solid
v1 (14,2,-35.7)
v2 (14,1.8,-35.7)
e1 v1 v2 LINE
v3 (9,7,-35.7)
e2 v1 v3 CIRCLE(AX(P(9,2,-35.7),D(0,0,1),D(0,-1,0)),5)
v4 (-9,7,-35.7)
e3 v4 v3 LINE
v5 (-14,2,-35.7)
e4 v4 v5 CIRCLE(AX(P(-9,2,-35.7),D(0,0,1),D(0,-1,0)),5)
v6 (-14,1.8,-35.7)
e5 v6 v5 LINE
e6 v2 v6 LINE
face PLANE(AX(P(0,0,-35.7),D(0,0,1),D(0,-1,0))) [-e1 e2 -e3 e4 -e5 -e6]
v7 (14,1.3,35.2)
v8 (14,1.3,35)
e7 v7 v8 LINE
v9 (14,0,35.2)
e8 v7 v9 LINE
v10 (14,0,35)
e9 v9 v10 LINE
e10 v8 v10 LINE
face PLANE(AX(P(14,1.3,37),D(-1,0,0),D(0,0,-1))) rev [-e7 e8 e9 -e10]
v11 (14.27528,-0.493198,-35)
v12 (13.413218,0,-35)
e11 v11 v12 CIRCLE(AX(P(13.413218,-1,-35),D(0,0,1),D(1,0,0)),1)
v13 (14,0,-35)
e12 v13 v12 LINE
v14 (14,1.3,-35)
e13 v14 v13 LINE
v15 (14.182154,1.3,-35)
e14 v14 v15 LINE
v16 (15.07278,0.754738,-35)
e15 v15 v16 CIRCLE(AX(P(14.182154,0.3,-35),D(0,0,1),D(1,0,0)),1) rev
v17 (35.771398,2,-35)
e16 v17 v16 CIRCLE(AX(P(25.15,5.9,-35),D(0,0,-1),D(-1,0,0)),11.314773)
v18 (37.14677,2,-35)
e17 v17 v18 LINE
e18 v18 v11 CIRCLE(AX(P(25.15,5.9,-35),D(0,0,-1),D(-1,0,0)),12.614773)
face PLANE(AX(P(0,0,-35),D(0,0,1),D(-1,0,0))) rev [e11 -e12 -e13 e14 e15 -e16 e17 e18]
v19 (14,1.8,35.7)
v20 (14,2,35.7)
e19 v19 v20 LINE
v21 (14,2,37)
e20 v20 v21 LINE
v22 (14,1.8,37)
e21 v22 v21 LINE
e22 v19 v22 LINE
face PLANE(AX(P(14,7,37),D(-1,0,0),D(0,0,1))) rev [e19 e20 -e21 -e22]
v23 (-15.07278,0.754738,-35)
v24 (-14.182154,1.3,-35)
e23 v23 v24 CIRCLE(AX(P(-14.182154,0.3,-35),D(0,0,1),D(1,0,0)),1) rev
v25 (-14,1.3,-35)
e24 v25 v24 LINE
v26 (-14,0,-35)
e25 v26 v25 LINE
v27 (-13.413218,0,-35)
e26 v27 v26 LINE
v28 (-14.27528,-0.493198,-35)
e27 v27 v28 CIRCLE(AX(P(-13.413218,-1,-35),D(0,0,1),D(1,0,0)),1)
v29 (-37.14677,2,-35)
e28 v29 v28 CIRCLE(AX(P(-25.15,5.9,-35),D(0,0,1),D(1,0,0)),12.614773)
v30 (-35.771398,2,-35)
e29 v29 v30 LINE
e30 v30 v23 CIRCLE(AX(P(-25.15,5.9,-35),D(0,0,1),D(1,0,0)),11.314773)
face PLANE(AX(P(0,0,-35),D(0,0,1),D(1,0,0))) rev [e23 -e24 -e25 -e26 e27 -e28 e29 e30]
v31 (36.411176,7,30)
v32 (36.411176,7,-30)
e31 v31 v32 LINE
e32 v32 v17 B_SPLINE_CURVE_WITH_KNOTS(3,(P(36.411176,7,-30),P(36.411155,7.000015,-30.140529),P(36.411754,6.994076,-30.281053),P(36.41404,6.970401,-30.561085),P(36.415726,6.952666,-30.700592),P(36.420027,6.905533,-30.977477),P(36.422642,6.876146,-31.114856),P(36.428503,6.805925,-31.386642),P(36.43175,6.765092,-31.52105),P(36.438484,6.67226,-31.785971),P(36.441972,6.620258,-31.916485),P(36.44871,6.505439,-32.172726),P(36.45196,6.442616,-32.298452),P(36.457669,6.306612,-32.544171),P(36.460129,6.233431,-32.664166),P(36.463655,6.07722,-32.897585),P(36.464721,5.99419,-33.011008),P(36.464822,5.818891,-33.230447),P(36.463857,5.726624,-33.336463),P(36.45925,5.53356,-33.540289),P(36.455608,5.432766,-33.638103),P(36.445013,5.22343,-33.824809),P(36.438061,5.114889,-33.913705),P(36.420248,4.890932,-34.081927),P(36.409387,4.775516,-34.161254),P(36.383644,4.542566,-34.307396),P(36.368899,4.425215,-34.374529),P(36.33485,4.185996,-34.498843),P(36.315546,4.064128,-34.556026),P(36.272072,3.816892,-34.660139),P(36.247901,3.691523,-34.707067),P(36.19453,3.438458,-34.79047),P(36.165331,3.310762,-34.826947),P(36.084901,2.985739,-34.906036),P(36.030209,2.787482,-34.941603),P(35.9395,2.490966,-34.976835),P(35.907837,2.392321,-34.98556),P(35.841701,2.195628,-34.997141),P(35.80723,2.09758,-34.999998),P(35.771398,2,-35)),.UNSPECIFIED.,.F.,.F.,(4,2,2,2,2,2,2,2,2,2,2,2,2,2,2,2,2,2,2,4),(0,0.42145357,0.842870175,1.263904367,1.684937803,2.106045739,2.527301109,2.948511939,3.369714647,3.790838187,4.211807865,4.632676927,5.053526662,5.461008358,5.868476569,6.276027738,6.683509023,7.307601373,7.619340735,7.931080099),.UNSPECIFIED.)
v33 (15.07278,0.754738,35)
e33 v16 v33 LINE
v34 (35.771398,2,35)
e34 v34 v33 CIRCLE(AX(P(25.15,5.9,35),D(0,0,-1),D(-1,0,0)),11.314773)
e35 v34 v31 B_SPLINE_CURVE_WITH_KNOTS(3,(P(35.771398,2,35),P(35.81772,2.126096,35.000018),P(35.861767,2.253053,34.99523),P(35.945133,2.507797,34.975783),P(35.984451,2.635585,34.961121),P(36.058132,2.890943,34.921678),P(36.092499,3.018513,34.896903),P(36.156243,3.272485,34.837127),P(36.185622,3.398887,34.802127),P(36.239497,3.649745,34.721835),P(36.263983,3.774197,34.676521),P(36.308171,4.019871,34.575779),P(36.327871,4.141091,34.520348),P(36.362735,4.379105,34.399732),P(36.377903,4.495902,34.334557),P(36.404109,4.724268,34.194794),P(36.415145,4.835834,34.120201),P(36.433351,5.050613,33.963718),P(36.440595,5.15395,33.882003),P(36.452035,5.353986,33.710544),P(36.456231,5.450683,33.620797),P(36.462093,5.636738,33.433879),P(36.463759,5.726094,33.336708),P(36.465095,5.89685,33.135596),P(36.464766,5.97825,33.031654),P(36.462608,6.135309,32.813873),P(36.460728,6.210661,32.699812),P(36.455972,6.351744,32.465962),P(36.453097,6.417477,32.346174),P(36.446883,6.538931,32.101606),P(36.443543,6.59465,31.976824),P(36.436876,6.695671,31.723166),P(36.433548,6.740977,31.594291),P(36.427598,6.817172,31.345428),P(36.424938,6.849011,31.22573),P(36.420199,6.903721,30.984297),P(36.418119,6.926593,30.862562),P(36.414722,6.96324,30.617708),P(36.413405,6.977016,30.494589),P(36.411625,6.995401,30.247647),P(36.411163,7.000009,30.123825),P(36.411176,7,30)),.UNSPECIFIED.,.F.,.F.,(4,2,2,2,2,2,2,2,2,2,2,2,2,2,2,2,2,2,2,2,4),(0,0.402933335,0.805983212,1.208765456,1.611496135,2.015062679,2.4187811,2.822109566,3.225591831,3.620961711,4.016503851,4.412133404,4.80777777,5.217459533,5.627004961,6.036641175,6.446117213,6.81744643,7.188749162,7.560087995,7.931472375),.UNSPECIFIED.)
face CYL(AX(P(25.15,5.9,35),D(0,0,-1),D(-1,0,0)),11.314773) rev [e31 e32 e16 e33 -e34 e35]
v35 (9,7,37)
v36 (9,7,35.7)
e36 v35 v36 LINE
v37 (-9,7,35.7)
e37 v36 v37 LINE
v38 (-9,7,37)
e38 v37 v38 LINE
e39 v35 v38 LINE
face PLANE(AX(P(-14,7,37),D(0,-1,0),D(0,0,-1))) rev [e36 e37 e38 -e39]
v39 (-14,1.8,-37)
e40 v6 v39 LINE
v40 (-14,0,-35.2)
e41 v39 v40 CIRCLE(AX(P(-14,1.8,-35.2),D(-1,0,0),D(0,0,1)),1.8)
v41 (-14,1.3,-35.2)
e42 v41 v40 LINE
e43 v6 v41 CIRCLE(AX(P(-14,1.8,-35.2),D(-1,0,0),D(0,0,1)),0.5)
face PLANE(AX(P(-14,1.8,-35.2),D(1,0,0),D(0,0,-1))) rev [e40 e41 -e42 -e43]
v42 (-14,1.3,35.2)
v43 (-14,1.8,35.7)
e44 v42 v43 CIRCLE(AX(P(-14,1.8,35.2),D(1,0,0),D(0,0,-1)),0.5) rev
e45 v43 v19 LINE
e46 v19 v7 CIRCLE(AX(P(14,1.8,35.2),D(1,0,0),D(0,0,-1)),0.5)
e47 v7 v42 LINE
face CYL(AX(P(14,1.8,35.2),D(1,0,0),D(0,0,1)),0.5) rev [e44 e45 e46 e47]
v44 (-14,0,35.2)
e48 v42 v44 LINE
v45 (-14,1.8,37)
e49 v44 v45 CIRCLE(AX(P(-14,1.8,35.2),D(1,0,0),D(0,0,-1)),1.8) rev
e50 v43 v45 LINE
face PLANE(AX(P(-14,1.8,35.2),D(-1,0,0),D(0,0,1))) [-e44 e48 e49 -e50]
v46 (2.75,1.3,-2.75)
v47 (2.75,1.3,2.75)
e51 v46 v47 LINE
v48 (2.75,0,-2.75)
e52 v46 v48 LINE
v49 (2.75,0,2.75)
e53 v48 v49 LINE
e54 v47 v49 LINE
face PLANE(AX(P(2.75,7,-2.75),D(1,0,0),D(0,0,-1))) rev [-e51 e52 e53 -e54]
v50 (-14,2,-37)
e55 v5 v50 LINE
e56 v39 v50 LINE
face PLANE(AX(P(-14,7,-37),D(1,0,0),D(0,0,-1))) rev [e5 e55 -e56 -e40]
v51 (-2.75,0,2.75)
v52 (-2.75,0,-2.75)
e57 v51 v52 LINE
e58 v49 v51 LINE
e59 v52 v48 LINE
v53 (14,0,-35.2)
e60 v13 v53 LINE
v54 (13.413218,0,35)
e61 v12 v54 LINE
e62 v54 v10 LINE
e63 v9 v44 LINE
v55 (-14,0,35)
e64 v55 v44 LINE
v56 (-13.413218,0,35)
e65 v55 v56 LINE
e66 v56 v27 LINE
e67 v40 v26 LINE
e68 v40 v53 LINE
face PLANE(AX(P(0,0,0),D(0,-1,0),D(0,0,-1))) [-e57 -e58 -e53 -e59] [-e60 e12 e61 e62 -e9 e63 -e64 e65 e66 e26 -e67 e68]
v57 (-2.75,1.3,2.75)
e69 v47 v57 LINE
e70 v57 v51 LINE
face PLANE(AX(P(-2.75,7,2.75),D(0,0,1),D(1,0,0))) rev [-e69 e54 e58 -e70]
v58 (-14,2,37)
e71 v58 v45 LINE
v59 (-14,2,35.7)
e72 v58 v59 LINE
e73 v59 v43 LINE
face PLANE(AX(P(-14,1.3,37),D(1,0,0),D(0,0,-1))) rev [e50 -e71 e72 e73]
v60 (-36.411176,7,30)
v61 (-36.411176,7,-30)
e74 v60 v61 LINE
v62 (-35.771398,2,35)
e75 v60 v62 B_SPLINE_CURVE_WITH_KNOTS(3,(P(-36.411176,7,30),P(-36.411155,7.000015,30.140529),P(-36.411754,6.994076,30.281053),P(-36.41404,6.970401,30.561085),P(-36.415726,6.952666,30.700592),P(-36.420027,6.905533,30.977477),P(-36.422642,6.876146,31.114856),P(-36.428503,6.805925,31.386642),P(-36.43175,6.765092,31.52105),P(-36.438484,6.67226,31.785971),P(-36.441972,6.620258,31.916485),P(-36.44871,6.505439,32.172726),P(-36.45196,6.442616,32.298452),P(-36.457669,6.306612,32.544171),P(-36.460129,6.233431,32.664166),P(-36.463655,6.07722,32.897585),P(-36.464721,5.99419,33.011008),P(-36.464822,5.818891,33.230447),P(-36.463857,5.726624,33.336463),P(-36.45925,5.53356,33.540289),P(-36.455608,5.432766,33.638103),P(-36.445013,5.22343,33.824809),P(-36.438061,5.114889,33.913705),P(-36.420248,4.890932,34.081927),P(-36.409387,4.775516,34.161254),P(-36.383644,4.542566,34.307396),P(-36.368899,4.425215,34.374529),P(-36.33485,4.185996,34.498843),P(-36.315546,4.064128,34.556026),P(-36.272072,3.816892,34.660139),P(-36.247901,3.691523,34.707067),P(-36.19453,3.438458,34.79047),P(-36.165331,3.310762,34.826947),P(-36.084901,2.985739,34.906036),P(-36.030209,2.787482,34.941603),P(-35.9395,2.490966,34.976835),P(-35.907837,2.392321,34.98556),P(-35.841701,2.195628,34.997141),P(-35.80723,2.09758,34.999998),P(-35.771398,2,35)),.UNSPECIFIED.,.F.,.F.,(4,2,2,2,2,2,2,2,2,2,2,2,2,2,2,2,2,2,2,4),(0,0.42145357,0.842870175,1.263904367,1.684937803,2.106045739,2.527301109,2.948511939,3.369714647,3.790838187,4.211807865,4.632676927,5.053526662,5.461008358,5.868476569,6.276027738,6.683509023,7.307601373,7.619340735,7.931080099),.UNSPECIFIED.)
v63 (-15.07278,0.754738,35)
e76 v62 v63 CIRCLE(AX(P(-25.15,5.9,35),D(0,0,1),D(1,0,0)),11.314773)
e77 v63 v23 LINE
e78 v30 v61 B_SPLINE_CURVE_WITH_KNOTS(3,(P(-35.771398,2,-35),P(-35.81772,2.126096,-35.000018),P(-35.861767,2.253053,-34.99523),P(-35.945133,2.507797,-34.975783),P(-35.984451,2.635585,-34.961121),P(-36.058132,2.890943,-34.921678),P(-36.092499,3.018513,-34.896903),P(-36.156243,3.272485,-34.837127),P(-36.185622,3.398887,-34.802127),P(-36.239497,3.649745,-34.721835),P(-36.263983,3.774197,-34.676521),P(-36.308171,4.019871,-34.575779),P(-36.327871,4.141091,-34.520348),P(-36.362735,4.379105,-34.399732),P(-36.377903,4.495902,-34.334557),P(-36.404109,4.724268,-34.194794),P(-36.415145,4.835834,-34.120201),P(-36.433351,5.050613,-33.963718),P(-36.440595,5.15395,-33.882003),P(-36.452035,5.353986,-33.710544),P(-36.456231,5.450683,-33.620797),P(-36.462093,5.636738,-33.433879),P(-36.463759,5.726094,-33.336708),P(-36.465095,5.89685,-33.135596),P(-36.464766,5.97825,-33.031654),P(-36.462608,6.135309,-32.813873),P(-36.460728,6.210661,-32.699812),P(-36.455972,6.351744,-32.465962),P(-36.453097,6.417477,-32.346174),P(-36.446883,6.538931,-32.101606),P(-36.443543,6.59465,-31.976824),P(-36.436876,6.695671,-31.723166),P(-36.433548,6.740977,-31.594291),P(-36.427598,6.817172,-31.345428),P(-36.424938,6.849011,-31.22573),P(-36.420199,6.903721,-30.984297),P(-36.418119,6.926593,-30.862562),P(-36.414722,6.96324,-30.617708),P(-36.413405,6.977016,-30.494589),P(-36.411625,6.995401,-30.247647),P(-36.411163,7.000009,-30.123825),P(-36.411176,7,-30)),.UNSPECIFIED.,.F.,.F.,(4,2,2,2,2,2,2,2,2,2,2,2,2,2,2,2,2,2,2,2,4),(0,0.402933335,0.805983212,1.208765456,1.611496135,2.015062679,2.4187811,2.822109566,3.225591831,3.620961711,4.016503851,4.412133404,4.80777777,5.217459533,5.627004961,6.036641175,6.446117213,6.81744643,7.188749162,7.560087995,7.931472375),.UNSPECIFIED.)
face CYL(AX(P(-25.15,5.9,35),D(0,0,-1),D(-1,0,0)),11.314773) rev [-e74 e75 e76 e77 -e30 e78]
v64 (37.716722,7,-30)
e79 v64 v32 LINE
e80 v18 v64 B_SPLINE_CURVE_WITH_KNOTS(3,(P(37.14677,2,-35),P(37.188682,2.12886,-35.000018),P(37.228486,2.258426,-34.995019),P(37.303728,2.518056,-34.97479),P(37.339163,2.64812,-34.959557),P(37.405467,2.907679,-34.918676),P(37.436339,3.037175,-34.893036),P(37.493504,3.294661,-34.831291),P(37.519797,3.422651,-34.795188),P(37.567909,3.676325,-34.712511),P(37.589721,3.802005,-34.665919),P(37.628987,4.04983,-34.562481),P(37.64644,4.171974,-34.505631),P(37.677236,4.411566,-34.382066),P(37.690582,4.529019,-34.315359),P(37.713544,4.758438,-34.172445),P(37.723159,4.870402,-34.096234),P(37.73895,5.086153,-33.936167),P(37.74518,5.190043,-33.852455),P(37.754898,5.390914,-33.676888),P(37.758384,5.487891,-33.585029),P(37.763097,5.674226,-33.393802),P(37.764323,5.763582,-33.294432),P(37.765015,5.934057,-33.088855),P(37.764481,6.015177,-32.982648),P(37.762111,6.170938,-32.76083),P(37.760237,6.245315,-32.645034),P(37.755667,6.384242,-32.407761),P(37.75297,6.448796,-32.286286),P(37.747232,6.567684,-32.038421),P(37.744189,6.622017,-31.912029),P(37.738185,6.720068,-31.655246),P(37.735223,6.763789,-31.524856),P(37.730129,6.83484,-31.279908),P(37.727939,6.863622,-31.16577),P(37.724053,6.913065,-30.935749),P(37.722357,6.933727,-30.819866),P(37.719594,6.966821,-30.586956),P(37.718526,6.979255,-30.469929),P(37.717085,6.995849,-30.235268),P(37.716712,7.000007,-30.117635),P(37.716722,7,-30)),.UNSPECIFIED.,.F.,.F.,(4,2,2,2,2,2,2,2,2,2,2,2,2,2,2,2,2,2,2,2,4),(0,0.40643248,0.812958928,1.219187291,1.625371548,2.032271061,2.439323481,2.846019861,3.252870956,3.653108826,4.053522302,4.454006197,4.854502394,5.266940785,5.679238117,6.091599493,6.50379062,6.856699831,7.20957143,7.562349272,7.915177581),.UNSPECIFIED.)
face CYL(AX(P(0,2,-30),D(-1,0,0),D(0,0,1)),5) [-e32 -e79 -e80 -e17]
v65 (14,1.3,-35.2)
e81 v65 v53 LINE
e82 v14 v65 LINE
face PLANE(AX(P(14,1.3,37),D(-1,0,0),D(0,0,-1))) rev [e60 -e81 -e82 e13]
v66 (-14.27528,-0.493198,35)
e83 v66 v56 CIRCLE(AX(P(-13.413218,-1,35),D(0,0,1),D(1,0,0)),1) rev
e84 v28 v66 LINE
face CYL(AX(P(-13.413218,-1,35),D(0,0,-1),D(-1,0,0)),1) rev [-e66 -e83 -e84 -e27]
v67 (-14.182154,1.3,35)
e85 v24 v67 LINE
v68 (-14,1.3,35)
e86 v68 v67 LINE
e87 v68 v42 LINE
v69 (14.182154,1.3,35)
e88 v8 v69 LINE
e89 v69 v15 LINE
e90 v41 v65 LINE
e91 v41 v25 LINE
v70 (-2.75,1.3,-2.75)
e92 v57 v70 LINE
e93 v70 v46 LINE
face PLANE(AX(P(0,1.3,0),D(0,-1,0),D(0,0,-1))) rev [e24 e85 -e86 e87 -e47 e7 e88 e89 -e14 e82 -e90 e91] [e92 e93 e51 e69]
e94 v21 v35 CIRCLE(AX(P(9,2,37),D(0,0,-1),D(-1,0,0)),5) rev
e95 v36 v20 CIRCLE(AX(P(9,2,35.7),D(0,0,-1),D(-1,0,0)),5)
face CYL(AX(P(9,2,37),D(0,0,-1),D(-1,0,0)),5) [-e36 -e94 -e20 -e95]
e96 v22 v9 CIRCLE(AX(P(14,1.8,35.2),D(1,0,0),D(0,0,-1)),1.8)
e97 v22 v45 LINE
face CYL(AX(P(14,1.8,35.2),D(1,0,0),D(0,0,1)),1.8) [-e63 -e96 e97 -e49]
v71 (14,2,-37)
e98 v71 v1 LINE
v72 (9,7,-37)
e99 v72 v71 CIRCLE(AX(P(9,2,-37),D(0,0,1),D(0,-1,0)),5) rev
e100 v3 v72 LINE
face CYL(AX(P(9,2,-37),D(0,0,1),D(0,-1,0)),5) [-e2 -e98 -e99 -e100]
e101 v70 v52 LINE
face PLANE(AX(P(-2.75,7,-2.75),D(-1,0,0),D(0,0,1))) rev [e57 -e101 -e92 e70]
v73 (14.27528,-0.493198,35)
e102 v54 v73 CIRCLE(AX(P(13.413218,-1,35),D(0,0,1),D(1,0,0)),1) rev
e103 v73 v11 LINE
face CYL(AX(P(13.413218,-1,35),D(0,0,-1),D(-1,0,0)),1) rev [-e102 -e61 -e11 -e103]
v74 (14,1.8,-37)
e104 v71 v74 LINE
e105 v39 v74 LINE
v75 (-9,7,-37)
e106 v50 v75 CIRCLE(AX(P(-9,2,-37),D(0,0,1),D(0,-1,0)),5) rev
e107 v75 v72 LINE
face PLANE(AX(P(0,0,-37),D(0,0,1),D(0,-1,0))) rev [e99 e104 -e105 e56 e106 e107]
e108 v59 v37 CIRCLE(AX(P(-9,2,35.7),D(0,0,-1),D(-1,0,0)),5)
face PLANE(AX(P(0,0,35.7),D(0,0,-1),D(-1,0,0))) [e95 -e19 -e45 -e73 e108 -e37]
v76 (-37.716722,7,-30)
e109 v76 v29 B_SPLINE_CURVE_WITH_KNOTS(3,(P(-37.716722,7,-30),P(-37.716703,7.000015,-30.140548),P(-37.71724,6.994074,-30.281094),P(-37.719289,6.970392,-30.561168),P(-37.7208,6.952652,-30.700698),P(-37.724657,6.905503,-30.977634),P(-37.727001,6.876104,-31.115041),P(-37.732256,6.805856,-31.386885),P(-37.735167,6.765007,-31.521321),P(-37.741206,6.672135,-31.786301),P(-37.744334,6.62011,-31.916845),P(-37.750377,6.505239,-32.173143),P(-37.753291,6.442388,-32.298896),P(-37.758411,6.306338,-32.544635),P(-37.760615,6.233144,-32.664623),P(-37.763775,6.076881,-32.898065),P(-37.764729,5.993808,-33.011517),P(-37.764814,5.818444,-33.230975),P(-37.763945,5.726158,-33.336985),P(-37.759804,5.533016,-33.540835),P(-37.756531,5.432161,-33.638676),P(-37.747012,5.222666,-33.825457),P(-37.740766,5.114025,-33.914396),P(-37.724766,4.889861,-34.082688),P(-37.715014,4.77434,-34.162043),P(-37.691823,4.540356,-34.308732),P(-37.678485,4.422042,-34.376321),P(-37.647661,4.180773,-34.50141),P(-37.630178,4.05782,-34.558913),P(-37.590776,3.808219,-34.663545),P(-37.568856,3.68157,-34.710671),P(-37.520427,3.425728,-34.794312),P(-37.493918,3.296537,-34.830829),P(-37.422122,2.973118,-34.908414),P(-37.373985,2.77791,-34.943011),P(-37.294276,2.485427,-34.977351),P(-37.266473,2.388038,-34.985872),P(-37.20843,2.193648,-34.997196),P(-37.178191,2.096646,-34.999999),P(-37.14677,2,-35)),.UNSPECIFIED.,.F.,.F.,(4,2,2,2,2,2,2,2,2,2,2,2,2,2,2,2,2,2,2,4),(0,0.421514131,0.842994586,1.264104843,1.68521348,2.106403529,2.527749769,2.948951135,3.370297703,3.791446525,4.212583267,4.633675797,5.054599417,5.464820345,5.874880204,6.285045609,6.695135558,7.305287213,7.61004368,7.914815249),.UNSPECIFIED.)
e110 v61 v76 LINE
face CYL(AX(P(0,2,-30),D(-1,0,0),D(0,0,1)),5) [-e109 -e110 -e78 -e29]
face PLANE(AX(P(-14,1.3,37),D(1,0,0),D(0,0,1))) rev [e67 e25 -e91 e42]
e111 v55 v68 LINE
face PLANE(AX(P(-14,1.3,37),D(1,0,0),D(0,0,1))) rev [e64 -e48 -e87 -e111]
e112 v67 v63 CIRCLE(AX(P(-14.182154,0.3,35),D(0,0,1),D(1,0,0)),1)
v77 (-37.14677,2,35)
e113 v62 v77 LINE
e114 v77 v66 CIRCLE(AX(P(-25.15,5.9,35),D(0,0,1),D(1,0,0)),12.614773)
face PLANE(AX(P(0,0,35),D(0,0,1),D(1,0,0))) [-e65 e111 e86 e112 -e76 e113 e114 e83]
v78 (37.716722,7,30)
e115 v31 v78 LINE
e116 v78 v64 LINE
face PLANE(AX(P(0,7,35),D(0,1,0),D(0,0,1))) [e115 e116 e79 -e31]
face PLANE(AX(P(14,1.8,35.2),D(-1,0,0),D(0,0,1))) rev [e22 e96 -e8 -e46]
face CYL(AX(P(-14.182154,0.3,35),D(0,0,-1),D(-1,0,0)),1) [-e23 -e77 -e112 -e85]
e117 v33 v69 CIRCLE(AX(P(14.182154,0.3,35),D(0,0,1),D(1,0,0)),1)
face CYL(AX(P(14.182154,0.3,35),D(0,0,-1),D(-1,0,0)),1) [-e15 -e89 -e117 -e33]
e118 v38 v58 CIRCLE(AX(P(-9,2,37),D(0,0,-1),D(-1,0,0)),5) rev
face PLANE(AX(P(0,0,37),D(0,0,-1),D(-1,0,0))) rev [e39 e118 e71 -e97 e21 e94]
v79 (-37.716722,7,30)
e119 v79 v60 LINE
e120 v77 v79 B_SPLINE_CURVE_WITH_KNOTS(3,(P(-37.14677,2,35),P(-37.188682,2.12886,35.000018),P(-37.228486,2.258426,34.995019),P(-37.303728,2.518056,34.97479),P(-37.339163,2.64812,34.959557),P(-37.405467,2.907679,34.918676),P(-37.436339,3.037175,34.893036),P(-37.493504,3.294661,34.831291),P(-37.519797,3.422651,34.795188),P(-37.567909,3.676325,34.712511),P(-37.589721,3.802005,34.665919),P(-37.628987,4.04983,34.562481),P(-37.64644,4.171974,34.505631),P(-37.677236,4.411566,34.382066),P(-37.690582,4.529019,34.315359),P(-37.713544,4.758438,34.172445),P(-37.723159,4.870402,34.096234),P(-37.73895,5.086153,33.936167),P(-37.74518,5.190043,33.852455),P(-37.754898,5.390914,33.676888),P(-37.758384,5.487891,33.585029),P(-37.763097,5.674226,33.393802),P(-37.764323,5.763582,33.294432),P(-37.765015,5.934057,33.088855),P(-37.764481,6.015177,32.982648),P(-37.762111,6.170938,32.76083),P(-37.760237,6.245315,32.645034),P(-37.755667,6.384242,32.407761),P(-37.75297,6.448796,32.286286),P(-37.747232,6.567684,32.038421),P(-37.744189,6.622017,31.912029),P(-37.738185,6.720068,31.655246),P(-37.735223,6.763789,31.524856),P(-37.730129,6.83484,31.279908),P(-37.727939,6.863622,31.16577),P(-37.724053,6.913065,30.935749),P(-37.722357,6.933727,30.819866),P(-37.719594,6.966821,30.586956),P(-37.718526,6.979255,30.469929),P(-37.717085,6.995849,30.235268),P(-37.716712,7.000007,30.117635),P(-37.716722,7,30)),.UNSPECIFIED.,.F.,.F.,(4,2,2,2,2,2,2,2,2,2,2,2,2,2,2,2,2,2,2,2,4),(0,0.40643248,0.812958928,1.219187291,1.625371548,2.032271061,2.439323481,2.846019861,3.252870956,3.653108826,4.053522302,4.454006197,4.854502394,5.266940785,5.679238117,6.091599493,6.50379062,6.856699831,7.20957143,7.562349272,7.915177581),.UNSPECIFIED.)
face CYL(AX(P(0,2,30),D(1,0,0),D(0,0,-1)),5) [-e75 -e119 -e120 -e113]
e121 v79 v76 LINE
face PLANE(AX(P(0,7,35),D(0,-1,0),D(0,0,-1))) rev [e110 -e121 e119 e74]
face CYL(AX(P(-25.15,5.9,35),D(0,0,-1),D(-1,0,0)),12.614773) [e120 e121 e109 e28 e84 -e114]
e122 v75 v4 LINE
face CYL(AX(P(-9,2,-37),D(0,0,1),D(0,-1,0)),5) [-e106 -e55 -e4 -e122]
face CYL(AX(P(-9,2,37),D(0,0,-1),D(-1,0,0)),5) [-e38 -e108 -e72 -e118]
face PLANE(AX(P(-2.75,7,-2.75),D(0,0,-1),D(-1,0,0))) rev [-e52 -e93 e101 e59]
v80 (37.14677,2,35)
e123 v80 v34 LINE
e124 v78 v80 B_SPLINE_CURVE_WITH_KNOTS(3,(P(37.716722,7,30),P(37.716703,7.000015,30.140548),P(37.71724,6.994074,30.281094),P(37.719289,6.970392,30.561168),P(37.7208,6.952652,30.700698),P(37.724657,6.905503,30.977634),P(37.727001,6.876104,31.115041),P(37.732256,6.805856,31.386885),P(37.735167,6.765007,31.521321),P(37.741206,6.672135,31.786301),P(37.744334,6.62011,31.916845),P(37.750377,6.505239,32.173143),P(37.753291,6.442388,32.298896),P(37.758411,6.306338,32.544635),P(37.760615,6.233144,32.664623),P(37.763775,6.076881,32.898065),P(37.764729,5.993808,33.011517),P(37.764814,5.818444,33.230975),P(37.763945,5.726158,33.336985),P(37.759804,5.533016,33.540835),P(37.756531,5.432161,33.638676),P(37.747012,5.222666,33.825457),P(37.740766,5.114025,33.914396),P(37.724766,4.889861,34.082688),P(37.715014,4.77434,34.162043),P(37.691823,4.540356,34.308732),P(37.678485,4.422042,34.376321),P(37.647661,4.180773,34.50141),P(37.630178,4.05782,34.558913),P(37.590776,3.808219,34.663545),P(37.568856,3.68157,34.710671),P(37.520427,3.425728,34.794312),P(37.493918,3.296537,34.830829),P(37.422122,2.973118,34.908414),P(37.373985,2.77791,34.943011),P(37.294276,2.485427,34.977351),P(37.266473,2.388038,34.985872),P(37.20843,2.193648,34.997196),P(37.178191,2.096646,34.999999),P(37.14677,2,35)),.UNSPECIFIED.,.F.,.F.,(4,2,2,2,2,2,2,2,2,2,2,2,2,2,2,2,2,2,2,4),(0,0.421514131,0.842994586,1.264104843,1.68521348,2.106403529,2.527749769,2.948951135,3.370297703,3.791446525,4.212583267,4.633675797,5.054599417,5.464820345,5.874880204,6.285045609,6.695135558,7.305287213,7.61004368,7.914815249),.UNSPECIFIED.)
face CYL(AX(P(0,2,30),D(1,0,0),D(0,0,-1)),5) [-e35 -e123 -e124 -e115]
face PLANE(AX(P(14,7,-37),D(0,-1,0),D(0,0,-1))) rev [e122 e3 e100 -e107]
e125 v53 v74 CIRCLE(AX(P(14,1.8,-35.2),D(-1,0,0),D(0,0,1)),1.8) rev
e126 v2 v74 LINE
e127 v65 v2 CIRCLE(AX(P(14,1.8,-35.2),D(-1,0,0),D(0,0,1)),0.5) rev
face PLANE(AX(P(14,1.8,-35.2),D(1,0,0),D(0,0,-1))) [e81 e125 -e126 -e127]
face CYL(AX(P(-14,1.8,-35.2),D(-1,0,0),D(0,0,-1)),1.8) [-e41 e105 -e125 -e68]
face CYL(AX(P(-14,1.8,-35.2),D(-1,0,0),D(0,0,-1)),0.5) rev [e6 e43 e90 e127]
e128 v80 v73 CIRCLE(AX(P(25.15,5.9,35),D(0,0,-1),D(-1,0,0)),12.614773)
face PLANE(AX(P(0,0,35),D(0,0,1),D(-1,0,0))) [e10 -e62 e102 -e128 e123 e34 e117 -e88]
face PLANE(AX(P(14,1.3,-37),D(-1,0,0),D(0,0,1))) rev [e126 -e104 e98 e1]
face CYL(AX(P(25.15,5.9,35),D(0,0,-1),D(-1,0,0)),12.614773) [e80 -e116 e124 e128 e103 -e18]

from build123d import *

# Parameters (mm, degrees)
SKETCH1_W                      = 28
SKETCH1_H                      = 74
BOSS_EXTRUDE1_DEPTH            = 1.3
EDGE_FLANGE1_STRIP_W           = 6.2
EDGE_FLANGE1_STRIP_H           = 1.3
EDGE_FLANGE1_STRIP_CUT_DEPTH   = 28
EDGE_FLANGE1_STRIP_2_W         = 6.2
EDGE_FLANGE1_STRIP_2_H         = 1.3
EDGE_FLANGE1_STRIP_CUT_2_DEPTH = 28
EDGE_FLANGE1_DEPTH             = 28
EDGE_FLANGE1_BEND_DEPTH        = 28
FILLET1_R                      = 5
SKETCH16_W                     = 5.5
SKETCH16_H                     = 5.5
CUT_EXTRUDE1_DEPTH             = 41.174618853
BOSS_EXTRUDE2_DEPTH            = 35
FILLET2_R                      = 5
FILLET3_R                      = 1


# Sheet-metal steps are written as plain solids
with BuildPart() as part:
    # Sketch1 → Boss-Extrude1 (new body)
    with BuildSketch(Plane(origin=(0, 0, 0), x_dir=(1, 0, 0), z_dir=(0, 1, 0))):
        Rectangle(SKETCH1_W, SKETCH1_H)
    extrude(amount=BOSS_EXTRUDE1_DEPTH)

    # Edge-Flange1 strip (across the edge) → Edge-Flange1 strip cut (cut)
    with BuildSketch(Plane(origin=(14, 1.3, -37), x_dir=(0, 0, 1), z_dir=(-1, 0, 0))):
        with Locations((-1.3, -0.65)):
            Rectangle(EDGE_FLANGE1_STRIP_W, EDGE_FLANGE1_STRIP_H)
    extrude(amount=EDGE_FLANGE1_STRIP_CUT_DEPTH, mode=Mode.SUBTRACT)

    # Edge-Flange1 strip 2 (across the edge) → Edge-Flange1 strip cut 2 (cut)
    with BuildSketch(Plane(origin=(-14, 1.3, 37), x_dir=(0, 0, -1), z_dir=(1, 0, 0))):
        with Locations((-1.3, -0.65)):
            Rectangle(EDGE_FLANGE1_STRIP_2_W, EDGE_FLANGE1_STRIP_2_H)
    extrude(amount=EDGE_FLANGE1_STRIP_CUT_2_DEPTH, mode=Mode.SUBTRACT)

    # Edge-Flange1 section (across the edge) → Edge-Flange1 (add)
    with BuildSketch(Plane(origin=(14, 1.3, -37), x_dir=(0, 0, 1), z_dir=(-1, 0, 0))):
        with BuildLine():
            Line((0, 0.5), (0, 5.7))
            Line((0, 5.7), (1.3, 5.7))
            Line((1.3, 5.7), (1.3, 0.5))
            ThreePointArc((1.3, 0.5), (1.446446609, 0.146446609), (1.8, 0))
            Line((1.8, 0), (1.8, -1.3))
            ThreePointArc((1.8, -1.3), (0.527207794, -0.772792206), (0, 0.5))
        make_face()
    extrude(amount=EDGE_FLANGE1_DEPTH)

    # Edge-Flange1 section 2 (across the edge) → Edge-Flange1 bend (add)
    with BuildSketch(Plane(origin=(-14, 1.3, 37), x_dir=(0, 0, -1), z_dir=(1, 0, 0))):
        with BuildLine():
            Line((0, 0.5), (0, 5.7))
            Line((0, 5.7), (1.3, 5.7))
            Line((1.3, 5.7), (1.3, 0.5))
            ThreePointArc((1.3, 0.5), (1.446446609, 0.146446609), (1.8, 0))
            Line((1.8, 0), (1.8, -1.3))
            ThreePointArc((1.8, -1.3), (0.527207794, -0.772792206), (0, 0.5))
        make_face()
    extrude(amount=EDGE_FLANGE1_BEND_DEPTH)

    # Fillet1
    fillet1_edges = [part.edges().sort_by_distance(p)[0] for p in [
        (14, 7, -36.35),
        (-14, 7, -36.35),
        (-14, 7, 36.35),
        (14, 7, 36.35),
    ]]
    fillet(fillet1_edges, radius=FILLET1_R)

    # Sketch16 → Cut-Extrude1 (cut, through all)
    with BuildSketch(Plane.XZ):
        Rectangle(SKETCH16_W, SKETCH16_H)
    extrude(amount=-CUT_EXTRUDE1_DEPTH, mode=Mode.SUBTRACT)

    # Sketch17 → Boss-Extrude2 (add, symmetric)
    with BuildSketch(Plane.XY):
        with BuildLine():
            Line((-36.411176225, 7), (-37.716721927, 7))
            ThreePointArc((-37.716721927, 7), (-28.02937954, -6.381761823), (-13.403830412, 1.3))
            Line((-13.403830412, 1.3), (-14.812491114, 1.3))
            ThreePointArc((-14.812491114, 1.3), (-28.03717688, -5.040214789), (-36.411176225, 7))
        make_face()
    boss_extrude2 = extrude(amount=BOSS_EXTRUDE2_DEPTH, both=True)

    # Mirror1: Boss-Extrude2 across plane
    add(boss_extrude2.mirror(Plane(origin=(0, 0, 0), x_dir=(0, 0, 1), z_dir=(1, 0, 0))))

    # Fillet2
    fillet2_edges = [part.edges().sort_by_distance(p)[0] for p in [
        (-37.063949076, 7, -35),
        (-37.063949076, 7, 35),
        (37.063949076, 7, 35),
        (37.063949076, 7, -35),
    ]]
    fillet(fillet2_edges, radius=FILLET2_R)

    # Fillet3
    fillet3_edges = [part.edges().sort_by_distance(p)[0] for p in [
        (-14, 0, 0),
        (-14.812491114, 1.3, 0),
        (14, 0, 0),
        (14.812491114, 1.3, 0),
    ]]
    fillet(fillet3_edges, radius=FILLET3_R)


solid = part.part
